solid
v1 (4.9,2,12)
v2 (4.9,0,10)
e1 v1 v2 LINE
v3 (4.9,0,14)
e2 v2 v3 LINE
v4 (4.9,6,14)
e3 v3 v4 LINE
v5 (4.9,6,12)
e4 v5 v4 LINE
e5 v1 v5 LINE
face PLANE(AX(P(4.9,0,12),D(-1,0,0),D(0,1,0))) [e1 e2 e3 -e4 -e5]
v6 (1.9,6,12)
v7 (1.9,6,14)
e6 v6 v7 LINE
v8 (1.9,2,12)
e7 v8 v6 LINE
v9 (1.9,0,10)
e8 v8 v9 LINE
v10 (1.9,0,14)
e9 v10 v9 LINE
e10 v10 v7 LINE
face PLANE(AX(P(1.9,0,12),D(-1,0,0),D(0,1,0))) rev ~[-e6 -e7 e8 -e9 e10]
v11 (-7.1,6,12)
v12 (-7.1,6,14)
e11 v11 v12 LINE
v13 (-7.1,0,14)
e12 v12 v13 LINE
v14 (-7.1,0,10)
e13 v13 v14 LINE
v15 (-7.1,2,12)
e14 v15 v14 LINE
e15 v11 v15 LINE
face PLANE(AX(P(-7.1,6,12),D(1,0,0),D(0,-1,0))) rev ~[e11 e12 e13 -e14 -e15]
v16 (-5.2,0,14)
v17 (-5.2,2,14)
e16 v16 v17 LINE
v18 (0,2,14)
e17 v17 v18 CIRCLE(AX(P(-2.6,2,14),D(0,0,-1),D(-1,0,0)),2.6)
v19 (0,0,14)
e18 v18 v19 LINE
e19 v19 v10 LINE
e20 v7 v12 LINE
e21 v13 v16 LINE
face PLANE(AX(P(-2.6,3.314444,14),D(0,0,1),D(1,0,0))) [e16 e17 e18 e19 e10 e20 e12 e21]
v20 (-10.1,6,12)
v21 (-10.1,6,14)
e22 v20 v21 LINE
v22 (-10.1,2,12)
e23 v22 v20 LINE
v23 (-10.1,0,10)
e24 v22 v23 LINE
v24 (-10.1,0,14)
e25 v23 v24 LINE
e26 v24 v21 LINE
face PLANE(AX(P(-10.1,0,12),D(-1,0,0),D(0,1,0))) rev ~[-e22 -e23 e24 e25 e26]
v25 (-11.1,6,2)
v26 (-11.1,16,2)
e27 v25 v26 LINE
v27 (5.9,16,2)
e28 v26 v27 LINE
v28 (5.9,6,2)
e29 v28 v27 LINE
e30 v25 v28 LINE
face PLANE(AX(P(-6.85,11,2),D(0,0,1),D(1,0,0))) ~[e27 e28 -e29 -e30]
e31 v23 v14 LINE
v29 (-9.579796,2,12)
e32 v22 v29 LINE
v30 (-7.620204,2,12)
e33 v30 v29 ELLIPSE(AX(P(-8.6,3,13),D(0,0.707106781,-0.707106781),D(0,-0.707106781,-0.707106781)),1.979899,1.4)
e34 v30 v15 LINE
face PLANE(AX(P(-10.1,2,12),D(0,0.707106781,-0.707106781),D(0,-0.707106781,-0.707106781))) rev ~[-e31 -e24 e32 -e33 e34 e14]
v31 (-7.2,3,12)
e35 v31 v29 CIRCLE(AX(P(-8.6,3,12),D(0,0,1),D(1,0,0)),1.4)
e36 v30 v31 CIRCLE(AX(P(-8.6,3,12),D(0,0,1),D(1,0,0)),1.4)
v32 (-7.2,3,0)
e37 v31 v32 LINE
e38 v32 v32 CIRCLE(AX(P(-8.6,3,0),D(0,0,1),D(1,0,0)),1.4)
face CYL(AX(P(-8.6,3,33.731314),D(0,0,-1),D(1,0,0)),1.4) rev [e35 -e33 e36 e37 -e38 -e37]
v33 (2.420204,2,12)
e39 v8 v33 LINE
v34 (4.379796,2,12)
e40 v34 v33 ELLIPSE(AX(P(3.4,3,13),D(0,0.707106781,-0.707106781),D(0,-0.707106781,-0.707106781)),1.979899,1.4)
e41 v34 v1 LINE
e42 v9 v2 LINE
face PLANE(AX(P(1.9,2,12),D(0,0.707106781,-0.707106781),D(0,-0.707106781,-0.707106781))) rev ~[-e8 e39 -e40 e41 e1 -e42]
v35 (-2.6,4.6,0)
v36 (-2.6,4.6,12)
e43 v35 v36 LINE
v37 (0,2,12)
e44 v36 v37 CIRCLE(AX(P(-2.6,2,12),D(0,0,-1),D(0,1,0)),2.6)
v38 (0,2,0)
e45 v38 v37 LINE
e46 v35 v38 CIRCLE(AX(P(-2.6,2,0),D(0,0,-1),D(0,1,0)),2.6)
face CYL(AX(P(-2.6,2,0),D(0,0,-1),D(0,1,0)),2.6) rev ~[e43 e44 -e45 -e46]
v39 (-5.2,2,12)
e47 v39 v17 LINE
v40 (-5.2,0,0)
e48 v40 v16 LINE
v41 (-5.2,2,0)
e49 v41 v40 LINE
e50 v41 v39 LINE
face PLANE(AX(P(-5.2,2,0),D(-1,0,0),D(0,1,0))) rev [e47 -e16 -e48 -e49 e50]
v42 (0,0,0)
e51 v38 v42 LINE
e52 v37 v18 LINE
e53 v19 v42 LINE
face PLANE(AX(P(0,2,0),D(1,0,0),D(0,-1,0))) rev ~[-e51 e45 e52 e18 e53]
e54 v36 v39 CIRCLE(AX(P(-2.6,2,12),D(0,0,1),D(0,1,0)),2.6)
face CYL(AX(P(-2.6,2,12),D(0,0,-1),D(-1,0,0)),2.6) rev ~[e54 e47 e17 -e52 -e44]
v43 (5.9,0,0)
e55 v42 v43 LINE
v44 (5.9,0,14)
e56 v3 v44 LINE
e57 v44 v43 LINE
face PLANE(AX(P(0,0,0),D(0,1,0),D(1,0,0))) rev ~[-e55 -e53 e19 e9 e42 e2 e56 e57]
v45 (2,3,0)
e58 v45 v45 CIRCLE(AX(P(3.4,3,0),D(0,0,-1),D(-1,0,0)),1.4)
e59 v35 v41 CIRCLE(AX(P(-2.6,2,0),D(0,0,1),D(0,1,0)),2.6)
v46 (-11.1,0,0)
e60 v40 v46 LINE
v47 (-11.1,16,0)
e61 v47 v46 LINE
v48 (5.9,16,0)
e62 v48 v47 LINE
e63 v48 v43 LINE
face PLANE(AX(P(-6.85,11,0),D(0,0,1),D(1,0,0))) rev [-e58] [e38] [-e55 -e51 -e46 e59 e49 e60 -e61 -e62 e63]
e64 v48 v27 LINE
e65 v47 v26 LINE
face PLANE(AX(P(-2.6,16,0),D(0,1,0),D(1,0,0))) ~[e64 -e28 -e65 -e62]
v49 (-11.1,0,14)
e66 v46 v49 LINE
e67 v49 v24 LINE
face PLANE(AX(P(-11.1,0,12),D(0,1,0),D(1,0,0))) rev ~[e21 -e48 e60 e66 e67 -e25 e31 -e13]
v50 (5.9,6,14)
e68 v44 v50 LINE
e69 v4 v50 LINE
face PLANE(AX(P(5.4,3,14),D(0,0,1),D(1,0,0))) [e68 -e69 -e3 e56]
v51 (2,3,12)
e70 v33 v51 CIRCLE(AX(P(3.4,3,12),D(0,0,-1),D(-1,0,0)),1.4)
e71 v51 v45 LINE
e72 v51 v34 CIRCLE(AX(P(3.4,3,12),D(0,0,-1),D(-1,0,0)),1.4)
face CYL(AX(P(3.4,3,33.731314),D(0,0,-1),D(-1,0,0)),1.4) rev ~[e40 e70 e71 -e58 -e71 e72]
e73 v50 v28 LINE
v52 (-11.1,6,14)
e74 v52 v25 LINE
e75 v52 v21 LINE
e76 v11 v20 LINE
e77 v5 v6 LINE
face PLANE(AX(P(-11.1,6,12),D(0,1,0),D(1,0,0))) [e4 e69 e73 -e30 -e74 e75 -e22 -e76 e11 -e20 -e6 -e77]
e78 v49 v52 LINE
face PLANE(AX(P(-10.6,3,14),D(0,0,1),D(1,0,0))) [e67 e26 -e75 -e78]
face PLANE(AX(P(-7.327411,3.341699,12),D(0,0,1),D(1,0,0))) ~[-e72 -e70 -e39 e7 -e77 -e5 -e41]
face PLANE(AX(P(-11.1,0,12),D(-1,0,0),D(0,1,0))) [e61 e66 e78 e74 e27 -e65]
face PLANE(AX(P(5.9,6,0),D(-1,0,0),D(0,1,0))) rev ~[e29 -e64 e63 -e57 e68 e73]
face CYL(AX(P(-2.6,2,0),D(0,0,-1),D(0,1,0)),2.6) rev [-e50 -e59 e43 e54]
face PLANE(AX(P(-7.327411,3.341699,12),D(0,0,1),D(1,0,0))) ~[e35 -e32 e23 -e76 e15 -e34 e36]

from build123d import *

# Parameters (mm, degrees)
F1_DEPTH    = 12
F0_W        = 8.5
F0_H        = 10
F2_DEPTH    = 2
F4_D        = 2.8
F6_W        = 1
F6_H        = 6
F7_DEPTH    = 2
F8_T1_DEPTH = 3
F8_T3_DEPTH = 3


# Not quite as in the source:
# - a fillet or chamfer that OpenCascade refuses, or shapes differently, is made with other operations: its cross-section is extruded or revolved along the edge and cut away or added


with BuildPart() as f1:
    # F0 (on Top) → F1 (new body)
    with BuildSketch(Plane.XY):
        with BuildLine():
            Line((0, 2), (0, 0))
            Line((0, 0), (5.9, 0))
            Line((5.9, 0), (5.9, 6))
            Line((5.9, 6), (-2.6, 6))
            Line((-2.6, 6), (-2.6, 4.6))
            ThreePointArc((-2.6, 4.6), (-0.7615223689, 3.8384776311), (0, 2))
        make_face()
    extrude(amount=F1_DEPTH)

    # F0 (on Top) → F2 (join)
    with BuildSketch(Plane.XY):
        with Locations((1.65, 11)):
            Rectangle(F0_W, F0_H)
    extrude(amount=F2_DEPTH)

    # F4 (through all)
    with Locations(Plane.XY.offset(12)):
        with Locations((3.4, 3)):
            Hole(F4_D / 2)

    # F5: F1 across face


with BuildPart() as f1_1:
    add(f1.part)
    add(f1.part.mirror(Plane(origin=(-2.6, 8.397826087, 3.2826086957), x_dir=(0, -1, 0), z_dir=(-1, 0, 0))))

    # F6 (on face) → F7 (join)
    with BuildSketch(Plane.XY.offset(12)):
        with Locations((-10.6, 3)):
            Rectangle(F6_W, F6_H)
        with BuildLine():
            Line((1.9, 6), (-7.1, 6))
            Line((-7.1, 6), (-7.1, 0))
            Line((-7.1, 0), (-5.2, 0))
            Line((-5.2, 0), (-5.2, 2))
            ThreePointArc((-5.2, 2), (-2.6, 4.6), (0, 2))
            Line((0, 2), (0, 0))
            Line((0, 0), (1.9, 0))
            Line((1.9, 0), (1.9, 6))
        make_face()
        with Locations((5.4, 3)):
            Rectangle(F6_W, F6_H)
    extrude(amount=F7_DEPTH)

    # F8: chamfer of 2 on 2 edges, made by hand

    # F8_s2 → F8_t1 (cut)
    with BuildSketch(Plane.YZ.offset(-10.1)):
        Polygon((2, 12), (0, 10), (0, 12), align=None)
    extrude(amount=F8_T1_DEPTH, mode=Mode.SUBTRACT)

    # F8_s4 → F8_t3 (cut)
    with BuildSketch(Plane.YZ.offset(1.9)):
        Polygon((2, 12), (0, 10), (0, 12), align=None)
    extrude(amount=F8_T3_DEPTH, mode=Mode.SUBTRACT)


solid = f1_1.part
